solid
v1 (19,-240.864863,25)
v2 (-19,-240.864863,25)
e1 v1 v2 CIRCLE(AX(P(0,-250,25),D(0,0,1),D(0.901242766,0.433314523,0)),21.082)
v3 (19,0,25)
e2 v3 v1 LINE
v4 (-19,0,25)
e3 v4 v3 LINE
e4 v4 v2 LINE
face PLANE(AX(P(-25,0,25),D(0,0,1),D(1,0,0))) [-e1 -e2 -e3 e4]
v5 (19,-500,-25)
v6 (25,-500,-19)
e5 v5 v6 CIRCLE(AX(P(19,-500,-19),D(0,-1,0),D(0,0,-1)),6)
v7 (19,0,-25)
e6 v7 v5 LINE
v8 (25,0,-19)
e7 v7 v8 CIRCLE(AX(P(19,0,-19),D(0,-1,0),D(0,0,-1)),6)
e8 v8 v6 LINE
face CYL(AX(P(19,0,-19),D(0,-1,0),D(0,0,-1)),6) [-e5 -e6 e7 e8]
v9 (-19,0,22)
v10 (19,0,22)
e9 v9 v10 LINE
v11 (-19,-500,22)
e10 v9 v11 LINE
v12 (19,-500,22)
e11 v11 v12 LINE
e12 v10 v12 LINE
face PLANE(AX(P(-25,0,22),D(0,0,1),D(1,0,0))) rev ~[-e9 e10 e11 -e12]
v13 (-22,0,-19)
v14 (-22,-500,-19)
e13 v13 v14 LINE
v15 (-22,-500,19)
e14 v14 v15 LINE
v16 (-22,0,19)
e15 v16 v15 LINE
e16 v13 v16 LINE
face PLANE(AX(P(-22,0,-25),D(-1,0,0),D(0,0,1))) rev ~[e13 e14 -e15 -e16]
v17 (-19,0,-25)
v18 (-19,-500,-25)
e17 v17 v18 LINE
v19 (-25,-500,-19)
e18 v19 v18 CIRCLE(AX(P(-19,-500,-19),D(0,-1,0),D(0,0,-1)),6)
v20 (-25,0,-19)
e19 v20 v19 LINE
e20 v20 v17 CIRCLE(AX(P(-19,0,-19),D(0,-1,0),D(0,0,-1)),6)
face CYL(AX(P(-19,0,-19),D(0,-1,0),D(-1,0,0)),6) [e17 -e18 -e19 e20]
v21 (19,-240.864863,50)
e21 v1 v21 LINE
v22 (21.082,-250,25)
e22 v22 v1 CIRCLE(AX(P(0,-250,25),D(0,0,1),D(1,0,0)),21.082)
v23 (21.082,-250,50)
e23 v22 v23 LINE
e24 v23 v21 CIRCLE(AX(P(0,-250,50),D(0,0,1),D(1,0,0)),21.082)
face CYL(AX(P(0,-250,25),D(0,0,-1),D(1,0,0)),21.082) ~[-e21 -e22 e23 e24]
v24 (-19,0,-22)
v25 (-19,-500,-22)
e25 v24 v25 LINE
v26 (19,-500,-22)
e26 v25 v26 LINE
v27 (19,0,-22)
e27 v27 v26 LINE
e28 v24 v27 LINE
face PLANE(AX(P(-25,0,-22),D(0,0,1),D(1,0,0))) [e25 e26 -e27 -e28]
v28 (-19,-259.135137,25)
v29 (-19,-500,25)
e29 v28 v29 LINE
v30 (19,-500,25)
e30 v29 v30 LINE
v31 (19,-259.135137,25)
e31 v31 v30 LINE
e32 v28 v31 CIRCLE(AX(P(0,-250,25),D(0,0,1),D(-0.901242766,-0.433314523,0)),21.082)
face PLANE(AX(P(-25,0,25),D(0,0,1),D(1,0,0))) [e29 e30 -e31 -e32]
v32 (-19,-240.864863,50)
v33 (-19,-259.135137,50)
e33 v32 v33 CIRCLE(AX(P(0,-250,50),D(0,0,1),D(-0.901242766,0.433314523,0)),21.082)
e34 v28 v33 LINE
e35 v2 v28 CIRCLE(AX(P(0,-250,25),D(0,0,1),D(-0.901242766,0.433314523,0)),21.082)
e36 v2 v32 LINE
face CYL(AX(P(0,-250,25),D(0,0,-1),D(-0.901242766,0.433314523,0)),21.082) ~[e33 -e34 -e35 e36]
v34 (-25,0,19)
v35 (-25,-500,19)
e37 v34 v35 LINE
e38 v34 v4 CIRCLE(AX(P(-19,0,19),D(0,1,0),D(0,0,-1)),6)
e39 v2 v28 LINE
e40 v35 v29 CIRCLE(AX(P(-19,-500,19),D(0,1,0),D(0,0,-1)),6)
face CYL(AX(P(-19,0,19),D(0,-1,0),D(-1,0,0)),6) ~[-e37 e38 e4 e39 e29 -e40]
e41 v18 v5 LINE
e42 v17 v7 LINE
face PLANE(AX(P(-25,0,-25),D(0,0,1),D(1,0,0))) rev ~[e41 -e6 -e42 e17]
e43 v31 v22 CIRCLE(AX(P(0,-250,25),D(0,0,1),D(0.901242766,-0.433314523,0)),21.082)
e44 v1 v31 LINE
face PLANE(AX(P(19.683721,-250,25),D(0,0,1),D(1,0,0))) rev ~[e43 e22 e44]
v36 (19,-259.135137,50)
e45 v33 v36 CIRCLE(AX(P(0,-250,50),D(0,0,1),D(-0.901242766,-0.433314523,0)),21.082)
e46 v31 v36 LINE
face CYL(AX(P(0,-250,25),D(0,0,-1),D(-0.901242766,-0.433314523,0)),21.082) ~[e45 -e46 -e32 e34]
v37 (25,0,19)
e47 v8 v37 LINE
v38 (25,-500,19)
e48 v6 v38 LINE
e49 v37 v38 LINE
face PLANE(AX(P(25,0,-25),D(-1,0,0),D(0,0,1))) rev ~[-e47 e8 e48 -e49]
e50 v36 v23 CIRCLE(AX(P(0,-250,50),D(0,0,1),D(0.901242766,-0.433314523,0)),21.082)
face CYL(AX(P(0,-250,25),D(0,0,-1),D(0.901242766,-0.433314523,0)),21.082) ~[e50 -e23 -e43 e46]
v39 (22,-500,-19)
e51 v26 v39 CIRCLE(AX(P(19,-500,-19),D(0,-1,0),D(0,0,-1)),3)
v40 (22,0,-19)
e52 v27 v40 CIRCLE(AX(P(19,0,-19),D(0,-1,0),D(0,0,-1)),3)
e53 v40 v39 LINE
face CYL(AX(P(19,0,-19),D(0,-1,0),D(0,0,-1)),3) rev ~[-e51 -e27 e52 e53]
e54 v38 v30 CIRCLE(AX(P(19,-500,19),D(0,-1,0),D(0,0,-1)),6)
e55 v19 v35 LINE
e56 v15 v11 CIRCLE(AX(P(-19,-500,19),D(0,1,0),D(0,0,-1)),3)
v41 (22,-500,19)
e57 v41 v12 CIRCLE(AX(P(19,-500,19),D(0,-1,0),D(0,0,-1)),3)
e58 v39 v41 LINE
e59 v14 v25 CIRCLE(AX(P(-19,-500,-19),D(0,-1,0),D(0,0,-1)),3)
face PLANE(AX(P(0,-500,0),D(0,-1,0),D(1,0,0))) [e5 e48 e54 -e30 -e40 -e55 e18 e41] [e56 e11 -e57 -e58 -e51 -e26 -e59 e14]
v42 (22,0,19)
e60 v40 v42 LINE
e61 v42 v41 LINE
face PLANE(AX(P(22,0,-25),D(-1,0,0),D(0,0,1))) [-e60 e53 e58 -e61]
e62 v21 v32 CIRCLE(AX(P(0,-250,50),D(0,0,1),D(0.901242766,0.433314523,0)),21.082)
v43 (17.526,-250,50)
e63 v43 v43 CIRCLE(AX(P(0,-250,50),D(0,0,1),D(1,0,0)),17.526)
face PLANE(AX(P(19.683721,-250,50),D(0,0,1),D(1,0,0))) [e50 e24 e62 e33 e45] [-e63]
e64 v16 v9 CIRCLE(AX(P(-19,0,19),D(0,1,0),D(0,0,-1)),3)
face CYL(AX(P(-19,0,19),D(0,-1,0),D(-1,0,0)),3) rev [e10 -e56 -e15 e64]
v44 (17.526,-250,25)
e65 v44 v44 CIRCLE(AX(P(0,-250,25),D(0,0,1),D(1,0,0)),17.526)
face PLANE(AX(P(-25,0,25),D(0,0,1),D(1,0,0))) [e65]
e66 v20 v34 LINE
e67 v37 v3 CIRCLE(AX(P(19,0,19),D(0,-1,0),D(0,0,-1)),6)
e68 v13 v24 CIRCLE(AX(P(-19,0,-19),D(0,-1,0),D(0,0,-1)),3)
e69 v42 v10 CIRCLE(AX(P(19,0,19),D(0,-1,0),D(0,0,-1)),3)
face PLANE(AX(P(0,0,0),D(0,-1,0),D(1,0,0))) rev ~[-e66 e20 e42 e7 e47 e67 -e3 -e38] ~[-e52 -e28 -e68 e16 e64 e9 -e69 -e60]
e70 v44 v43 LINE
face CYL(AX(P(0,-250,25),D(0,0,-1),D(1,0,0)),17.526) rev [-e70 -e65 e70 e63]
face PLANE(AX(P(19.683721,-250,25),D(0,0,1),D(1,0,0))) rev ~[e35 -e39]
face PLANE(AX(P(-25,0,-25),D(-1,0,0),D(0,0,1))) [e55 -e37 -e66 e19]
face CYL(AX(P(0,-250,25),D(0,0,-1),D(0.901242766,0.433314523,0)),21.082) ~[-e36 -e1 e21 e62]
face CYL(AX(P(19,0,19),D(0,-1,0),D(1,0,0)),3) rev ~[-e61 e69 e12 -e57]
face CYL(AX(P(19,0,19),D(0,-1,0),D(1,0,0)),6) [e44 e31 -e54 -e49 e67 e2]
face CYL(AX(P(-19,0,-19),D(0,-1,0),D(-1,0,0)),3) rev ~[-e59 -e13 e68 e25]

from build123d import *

# Parameters (mm, degrees)
F0_W     = 50
F0_H     = 50
F1_DEPTH = 500
F2_R     = 6
F3_T     = -3
F4_R     = 17.526
F5_DEPTH = 25


with BuildPart() as f1:
    # F0 (on Front) → F1 (new body)
    with BuildSketch(Plane.XZ):
        Rectangle(F0_W, F0_H)
    extrude(amount=F1_DEPTH)

    # F2
    f2_edges = [f1.edges().sort_by_distance(p)[0] for p in [
        (25, -250, 25),
        (-25, -250, 25),
        (25, -250, -25),
        (-25, -250, -25),
    ]]
    fillet(f2_edges, radius=F2_R)

    # F3
    f3_openings = [f1.faces().sort_by_distance(p)[0] for p in [
        (0, 0, 0),
        (0, -500, 0),
    ]]
    offset(amount=F3_T, openings=f3_openings)

    # F4 (on face) → F5 (join)
    with BuildSketch(Plane.XY.offset(25)):
        with BuildLine():
            ThreePointArc((19, -259.1351367806), (20.5549108974, -254.6846944404), (21.082, -250))
            ThreePointArc((21.082, -250), (20.5549108974, -245.3153055596), (19, -240.8648632194))
            Line((19, -240.8648632194), (19, -259.1351367806))
        make_face()
        with BuildLine():
            Line((19, -259.1351367806), (19, -240.8648632194))
            ThreePointArc((19, -240.8648632194), (0, -228.918), (-19, -240.8648632194))
            Line((-19, -240.8648632194), (-19, -259.1351367806))
            ThreePointArc((-19, -259.1351367806), (0, -271.082), (19, -259.1351367806))
        make_face()
        with Locations((0, -250)):
            Circle(F4_R, mode=Mode.SUBTRACT)
        with BuildLine():
            Line((-19, -259.1351367806), (-19, -240.8648632194))
            ThreePointArc((-19, -240.8648632194), (-21.082, -250), (-19, -259.1351367806))
        make_face()
    extrude(amount=F5_DEPTH)


solid = f1.part
